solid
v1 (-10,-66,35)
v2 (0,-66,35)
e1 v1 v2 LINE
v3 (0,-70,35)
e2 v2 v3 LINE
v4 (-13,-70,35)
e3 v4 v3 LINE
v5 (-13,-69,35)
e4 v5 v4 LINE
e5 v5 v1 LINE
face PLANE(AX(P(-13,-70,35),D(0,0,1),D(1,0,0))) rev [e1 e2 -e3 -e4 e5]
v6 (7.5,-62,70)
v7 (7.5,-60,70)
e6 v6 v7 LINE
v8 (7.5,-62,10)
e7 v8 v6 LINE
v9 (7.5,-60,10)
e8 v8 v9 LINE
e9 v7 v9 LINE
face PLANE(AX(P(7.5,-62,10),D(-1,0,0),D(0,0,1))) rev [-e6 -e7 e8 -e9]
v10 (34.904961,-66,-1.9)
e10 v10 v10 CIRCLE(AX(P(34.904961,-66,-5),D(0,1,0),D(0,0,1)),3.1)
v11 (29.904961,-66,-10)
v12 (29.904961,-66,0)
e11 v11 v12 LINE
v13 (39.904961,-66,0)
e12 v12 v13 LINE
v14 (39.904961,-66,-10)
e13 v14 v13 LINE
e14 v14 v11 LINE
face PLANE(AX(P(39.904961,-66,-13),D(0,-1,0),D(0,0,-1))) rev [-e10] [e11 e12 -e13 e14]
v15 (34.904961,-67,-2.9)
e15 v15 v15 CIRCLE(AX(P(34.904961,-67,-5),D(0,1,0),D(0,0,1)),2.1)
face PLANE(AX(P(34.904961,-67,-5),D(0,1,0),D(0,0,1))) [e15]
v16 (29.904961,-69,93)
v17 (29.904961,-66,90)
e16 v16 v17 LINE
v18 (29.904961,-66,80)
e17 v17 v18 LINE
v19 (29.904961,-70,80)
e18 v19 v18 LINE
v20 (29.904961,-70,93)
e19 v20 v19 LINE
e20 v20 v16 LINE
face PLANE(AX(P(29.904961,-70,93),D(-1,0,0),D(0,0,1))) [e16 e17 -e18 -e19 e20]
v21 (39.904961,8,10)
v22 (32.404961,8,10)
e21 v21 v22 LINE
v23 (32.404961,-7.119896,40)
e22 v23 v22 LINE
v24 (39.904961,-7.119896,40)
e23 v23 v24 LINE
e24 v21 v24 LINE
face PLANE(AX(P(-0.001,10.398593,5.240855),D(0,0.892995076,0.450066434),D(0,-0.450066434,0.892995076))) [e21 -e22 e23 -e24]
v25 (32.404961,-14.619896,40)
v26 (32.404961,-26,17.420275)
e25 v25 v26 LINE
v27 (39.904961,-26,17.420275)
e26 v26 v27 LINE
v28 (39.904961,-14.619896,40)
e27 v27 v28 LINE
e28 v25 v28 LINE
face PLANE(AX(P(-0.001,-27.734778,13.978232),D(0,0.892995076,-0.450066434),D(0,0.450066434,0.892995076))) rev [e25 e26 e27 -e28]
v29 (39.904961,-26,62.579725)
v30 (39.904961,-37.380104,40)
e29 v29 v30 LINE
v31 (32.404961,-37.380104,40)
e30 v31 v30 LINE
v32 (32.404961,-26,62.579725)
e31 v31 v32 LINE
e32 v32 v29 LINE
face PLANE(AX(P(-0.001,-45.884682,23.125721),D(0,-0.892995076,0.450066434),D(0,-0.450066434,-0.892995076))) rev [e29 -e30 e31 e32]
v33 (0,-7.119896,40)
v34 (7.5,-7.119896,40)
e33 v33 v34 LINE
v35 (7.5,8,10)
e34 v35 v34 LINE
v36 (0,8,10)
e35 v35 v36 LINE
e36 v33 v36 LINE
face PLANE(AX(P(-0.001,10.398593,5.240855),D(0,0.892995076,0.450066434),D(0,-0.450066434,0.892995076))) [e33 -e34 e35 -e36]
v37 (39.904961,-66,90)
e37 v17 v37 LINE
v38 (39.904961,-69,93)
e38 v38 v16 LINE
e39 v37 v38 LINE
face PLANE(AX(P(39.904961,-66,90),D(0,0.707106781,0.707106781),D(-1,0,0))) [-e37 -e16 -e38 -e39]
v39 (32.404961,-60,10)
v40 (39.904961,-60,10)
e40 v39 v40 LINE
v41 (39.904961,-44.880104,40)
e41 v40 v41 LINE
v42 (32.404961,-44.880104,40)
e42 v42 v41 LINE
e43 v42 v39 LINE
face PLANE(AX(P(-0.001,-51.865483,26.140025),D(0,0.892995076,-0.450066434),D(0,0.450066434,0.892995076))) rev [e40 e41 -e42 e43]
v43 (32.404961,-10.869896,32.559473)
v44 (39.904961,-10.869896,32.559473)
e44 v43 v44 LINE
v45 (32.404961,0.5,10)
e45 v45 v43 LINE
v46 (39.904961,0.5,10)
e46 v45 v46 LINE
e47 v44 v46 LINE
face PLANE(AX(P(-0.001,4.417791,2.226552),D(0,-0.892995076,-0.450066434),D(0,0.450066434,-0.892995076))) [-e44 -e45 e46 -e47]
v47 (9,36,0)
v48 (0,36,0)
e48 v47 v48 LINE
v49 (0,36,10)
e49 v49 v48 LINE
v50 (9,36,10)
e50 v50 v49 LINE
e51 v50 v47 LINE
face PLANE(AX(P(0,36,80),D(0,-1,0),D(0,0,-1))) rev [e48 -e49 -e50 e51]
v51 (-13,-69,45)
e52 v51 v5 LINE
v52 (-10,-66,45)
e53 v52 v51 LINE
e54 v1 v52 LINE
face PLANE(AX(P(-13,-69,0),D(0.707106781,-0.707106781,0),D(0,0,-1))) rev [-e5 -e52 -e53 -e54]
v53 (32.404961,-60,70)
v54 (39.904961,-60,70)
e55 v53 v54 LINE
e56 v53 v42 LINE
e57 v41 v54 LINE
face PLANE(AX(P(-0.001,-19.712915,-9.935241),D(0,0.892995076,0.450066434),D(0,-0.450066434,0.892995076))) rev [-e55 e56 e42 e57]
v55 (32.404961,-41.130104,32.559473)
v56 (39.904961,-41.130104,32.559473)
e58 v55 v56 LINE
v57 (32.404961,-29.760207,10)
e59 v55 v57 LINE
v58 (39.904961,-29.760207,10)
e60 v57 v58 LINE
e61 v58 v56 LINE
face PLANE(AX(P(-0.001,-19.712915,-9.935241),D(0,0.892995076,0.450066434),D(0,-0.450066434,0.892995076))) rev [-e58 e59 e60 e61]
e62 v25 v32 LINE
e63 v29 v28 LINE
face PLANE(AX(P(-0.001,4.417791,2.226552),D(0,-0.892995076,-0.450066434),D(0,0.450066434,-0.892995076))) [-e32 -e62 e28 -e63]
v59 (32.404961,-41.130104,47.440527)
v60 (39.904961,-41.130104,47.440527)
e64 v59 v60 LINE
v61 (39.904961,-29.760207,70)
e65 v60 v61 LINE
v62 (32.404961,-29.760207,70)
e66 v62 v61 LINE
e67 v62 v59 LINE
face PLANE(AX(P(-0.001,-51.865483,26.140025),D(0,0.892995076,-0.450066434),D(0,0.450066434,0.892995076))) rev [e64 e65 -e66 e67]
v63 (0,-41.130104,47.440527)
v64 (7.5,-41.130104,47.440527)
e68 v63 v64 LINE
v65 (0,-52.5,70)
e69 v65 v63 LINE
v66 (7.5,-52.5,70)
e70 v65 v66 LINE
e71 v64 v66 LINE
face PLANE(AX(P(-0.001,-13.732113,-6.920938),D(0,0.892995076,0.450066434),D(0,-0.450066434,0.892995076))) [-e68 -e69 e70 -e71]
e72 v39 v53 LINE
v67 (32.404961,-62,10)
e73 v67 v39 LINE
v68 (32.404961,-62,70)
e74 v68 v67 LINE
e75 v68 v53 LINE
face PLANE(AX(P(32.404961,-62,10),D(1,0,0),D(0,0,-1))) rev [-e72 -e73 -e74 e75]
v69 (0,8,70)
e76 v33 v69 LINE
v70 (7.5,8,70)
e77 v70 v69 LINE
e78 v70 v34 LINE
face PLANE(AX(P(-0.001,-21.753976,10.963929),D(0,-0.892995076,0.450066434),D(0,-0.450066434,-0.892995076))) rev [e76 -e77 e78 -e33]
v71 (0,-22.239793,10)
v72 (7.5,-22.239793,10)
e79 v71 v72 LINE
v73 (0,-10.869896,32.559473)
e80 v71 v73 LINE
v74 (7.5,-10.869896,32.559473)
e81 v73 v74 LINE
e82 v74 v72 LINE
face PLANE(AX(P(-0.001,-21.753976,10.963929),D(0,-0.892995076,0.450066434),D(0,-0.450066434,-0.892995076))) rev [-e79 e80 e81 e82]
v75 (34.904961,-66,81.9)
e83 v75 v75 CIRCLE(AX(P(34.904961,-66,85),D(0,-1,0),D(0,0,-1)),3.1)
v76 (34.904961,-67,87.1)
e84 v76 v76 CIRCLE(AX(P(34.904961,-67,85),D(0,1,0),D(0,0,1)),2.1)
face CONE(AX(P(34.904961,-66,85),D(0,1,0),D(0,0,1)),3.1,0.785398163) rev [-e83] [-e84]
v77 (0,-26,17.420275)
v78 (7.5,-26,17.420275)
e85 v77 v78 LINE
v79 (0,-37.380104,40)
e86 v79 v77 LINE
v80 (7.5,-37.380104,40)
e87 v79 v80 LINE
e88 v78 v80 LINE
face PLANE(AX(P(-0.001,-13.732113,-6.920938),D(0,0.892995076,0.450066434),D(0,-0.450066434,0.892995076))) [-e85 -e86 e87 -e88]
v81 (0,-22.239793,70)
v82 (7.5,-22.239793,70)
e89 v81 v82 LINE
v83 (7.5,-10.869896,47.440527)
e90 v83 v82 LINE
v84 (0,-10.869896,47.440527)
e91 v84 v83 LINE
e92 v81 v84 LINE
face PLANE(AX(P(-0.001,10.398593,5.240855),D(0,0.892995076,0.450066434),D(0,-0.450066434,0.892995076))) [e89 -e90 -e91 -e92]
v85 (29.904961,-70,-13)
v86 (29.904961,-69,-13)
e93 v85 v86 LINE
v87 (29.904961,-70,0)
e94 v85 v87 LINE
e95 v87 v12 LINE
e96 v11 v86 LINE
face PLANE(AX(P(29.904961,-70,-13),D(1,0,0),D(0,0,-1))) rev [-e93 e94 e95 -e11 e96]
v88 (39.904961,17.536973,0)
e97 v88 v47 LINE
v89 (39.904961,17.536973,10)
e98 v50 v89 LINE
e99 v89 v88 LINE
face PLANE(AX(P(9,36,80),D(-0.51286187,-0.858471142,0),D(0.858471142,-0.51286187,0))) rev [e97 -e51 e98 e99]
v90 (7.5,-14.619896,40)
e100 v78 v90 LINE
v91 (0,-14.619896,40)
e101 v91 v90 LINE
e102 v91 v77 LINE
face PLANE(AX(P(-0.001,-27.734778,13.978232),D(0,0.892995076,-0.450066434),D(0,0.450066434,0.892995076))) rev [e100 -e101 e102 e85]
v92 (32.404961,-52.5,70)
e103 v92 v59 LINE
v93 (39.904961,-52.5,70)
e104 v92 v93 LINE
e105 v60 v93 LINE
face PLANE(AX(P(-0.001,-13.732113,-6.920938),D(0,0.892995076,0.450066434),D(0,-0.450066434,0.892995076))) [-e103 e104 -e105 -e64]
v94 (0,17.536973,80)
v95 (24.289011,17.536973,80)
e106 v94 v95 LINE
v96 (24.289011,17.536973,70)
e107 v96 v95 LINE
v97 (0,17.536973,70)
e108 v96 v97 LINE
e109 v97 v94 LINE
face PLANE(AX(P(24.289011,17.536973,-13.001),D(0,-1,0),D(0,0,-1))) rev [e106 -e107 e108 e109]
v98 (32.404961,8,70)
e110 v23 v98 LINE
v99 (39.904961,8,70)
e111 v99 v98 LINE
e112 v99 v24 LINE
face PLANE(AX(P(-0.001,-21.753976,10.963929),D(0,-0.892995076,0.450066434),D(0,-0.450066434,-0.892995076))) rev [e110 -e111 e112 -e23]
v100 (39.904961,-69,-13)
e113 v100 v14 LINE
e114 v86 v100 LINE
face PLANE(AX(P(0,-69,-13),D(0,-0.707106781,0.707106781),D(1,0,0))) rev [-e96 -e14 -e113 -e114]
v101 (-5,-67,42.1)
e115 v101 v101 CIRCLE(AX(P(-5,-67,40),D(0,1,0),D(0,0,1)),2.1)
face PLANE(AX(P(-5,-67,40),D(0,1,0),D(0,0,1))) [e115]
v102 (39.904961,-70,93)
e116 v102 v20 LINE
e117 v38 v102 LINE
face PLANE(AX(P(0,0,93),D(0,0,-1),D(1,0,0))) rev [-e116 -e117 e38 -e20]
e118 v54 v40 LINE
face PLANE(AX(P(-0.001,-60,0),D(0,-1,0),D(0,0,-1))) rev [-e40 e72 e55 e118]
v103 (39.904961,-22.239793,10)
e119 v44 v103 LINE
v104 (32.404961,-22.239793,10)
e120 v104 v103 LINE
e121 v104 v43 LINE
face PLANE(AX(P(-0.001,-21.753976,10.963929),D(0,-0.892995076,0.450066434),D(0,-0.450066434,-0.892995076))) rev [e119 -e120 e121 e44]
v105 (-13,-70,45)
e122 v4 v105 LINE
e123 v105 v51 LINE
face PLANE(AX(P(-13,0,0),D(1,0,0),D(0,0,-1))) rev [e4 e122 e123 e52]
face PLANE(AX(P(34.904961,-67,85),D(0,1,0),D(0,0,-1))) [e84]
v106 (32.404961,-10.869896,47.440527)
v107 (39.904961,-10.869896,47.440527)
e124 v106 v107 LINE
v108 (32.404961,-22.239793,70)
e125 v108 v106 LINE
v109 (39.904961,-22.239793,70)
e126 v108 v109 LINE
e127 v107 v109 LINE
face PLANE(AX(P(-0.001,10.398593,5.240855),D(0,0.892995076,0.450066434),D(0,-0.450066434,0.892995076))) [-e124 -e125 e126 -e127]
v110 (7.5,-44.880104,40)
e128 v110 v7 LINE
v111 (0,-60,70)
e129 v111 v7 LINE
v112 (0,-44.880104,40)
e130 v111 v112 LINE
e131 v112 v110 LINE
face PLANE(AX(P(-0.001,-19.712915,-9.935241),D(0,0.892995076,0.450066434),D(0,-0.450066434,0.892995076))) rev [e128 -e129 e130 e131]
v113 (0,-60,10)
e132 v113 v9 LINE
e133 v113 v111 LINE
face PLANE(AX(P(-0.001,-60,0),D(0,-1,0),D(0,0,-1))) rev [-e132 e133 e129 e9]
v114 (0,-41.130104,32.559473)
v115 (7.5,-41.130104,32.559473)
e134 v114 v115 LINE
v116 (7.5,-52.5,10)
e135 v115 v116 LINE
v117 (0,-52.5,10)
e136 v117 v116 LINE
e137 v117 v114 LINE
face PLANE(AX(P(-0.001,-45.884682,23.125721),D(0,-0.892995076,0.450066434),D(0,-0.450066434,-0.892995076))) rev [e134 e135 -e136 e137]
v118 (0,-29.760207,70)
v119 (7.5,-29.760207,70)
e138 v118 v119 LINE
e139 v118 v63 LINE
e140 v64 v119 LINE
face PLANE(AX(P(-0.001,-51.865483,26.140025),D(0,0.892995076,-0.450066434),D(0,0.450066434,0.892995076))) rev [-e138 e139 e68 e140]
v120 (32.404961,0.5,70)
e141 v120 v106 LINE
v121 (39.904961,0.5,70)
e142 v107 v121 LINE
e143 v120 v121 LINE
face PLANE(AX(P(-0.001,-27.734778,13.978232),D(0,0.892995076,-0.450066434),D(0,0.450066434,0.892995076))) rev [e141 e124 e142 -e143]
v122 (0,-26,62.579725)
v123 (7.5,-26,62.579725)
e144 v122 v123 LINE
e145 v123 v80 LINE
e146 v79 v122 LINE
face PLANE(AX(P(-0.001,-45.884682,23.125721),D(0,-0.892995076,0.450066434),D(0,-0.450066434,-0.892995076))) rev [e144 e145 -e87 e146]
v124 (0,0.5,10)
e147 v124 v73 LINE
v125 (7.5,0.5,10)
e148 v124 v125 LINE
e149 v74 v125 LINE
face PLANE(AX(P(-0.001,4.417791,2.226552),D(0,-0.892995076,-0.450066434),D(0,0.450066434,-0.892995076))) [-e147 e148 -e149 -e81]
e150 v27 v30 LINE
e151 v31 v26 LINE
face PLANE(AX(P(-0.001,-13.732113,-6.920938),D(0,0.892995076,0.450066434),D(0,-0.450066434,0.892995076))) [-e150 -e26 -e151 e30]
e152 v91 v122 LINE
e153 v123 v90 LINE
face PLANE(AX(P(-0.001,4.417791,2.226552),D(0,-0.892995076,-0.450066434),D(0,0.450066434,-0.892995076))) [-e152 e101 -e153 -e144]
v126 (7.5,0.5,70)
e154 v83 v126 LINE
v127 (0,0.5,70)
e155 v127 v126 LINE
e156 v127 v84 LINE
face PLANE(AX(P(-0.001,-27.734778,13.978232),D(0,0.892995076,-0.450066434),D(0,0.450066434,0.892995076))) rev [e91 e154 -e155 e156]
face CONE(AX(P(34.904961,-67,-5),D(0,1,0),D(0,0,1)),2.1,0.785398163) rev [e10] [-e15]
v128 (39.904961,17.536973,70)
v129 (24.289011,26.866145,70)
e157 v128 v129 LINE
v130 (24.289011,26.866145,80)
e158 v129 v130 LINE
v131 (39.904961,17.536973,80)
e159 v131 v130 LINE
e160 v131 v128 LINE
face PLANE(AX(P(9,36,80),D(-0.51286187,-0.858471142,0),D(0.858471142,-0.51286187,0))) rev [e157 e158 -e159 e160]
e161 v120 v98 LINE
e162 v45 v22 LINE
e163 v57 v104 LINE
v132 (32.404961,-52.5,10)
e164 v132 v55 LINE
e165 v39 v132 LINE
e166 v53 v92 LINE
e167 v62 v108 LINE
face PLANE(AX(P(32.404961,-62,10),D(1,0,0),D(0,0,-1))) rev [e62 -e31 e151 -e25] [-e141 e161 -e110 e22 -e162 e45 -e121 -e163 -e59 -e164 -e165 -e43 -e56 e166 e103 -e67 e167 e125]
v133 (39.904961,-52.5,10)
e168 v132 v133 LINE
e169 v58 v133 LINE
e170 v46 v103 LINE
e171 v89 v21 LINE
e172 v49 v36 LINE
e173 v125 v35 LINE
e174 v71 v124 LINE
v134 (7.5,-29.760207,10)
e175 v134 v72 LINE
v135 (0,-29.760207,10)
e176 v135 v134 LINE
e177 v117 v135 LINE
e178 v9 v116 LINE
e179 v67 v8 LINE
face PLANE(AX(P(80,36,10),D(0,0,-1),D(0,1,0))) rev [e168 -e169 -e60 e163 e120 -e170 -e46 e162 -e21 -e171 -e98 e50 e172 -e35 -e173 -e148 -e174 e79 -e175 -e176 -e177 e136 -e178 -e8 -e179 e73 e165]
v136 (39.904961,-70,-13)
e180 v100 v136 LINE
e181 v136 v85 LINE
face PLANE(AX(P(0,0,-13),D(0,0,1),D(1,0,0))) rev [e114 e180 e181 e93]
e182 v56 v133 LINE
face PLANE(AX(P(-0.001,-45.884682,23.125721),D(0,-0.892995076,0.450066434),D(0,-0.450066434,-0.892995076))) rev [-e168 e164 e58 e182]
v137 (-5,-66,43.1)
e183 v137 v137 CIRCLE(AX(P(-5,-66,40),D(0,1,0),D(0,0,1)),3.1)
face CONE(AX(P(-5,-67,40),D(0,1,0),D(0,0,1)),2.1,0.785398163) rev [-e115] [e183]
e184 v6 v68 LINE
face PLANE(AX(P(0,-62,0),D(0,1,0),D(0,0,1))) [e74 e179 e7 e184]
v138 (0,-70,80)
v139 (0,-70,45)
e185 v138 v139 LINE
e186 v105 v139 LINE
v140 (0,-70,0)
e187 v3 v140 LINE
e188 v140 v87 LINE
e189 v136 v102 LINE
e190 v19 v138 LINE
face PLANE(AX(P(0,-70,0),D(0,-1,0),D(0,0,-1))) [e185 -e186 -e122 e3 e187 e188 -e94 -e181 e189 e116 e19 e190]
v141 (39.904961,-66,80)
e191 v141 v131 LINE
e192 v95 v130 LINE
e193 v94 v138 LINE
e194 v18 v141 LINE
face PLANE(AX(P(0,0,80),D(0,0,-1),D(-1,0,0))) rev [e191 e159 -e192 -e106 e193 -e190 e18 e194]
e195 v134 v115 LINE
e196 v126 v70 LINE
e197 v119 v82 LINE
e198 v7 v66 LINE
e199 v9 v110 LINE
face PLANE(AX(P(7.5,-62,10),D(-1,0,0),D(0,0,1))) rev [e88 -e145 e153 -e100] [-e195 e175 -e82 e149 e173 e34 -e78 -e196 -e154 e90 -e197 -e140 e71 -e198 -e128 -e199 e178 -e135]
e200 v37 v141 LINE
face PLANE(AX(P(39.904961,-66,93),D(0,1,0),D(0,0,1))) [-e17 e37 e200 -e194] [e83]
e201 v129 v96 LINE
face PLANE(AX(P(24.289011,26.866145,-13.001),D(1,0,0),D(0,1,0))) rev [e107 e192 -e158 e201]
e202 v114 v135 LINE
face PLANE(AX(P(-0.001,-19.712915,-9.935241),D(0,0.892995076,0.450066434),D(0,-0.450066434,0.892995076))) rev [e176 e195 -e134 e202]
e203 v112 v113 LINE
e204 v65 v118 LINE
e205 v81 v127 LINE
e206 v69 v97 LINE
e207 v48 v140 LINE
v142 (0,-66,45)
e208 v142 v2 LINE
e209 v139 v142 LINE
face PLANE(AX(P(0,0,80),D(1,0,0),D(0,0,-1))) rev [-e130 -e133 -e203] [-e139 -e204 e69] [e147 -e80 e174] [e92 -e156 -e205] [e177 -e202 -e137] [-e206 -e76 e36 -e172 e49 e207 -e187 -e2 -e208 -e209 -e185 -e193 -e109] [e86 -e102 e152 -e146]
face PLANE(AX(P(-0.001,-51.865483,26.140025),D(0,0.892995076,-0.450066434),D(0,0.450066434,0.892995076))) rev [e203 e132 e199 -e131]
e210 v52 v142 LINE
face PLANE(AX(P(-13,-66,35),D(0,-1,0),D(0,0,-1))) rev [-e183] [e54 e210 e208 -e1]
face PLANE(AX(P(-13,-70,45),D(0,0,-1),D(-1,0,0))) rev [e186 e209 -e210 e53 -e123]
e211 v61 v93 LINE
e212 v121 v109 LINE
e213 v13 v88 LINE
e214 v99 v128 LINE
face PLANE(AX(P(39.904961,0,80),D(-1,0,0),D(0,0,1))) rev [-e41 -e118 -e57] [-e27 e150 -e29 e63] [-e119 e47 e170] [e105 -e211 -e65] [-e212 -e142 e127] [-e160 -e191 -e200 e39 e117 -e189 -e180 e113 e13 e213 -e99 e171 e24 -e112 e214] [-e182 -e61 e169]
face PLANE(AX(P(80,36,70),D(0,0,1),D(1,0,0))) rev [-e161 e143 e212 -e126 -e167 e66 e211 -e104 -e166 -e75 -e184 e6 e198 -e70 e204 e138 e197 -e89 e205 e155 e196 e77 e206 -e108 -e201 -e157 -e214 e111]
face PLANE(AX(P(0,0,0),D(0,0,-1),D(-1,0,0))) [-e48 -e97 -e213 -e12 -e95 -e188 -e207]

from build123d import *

# Parameters (mm, degrees)
BOSS_EXTRUDE1_DEPTH      = 80
SKETCH2_W                = 60
SKETCH2_H                = 28
CUT_EXTRUDE1_DEPTH       = 80
SKETCH3_W                = 39.904961116
SKETCH3_H                = 80
BOSS_EXTRUDE2_DEPTH      = 70
CUT_EXTRUDE4_REACH       = 115.545
SKETCH6_W                = 24.904961116
SKETCH6_H                = 60
CUT_EXTRUDE5_DEPTH       = 70
SKETCH7_W                = 10
SKETCH7_H                = 4
BOSS_EXTRUDE3_DEPTH      = 13
SKETCH8_R                = 3.1
CUT_EXTRUDE6_DEPTH       = 1
CHAMFER1_SIZE            = 1
CHAMFER2_SIZE            = 3
CHAMFER2_OF_MIRROR1_SIZE = 3
SKETCH9_W                = 10
SKETCH9_H                = 4
BOSS_EXTRUDE4_DEPTH      = 13
SKETCH10_R               = 3.1
CUT_EXTRUDE7_DEPTH       = 1
CHAMFER3_SIZE            = 3
CHAMFER4_SIZE            = 1
CHAMFER5_SIZE            = 1
CUT_EXTRUDE8_REACH       = 125.05


with BuildPart() as part:
    # Sketch1 → Boss-Extrude1 (new body)
    with BuildSketch(Plane.XY):
        Polygon((9, 36), (39.904961116, 17.536972664), (39.904961116, 0), (0, 0), (0, 36), align=None)
    extrude(amount=BOSS_EXTRUDE1_DEPTH)

    # Sketch2 → Cut-Extrude1 (cut)
    with BuildSketch(Plane.ZY):
        with Locations((40, 22)):
            Rectangle(SKETCH2_W, SKETCH2_H)
    extrude(amount=-CUT_EXTRUDE1_DEPTH, mode=Mode.SUBTRACT)

    # Sketch3 → Boss-Extrude2 (add)
    with BuildSketch(Plane.XZ):
        with Locations((19.952480558, 40)):
            Rectangle(SKETCH3_W, SKETCH3_H)
    extrude(amount=BOSS_EXTRUDE2_DEPTH)

    # Sketch4 → Cut-Extrude4 (cut, up to next)
    with BuildSketch(Plane(origin=(39.904961116, 0, 0), x_dir=(0, 0, -1), z_dir=(1, 0, 0)), mode=Mode.PRIVATE) as cut_extrude4_sk1:
        Polygon((-10, 8), (-40, -7.119896394), (-70, 8), align=None)
    cut_extrude4_tool1 = extrude(cut_extrude4_sk1.sketch, amount=-CUT_EXTRUDE4_REACH, mode=Mode.PRIVATE) & part.part
    # Sketch4 → Cut-Extrude4 (cut, up to next)
    with BuildSketch(Plane(origin=(39.904961116, 0, 0), x_dir=(0, 0, -1), z_dir=(1, 0, 0)), mode=Mode.PRIVATE) as cut_extrude4_sk2:
        Polygon((-47.440527175, -10.869896394), (-70, 0.5), (-70, -22.239792788), align=None)
    cut_extrude4_tool2 = extrude(cut_extrude4_sk2.sketch, amount=-CUT_EXTRUDE4_REACH, mode=Mode.PRIVATE) & part.part
    # Sketch4 → Cut-Extrude4 (cut, up to next)
    with BuildSketch(Plane(origin=(39.904961116, 0, 0), x_dir=(0, 0, -1), z_dir=(1, 0, 0)), mode=Mode.PRIVATE) as cut_extrude4_sk3:
        Polygon((-47.440527175, -41.130103606), (-70, -29.760207212), (-70, -52.5), align=None)
    cut_extrude4_tool3 = extrude(cut_extrude4_sk3.sketch, amount=-CUT_EXTRUDE4_REACH, mode=Mode.PRIVATE) & part.part
    # Sketch4 → Cut-Extrude4 (cut, up to next)
    with BuildSketch(Plane(origin=(39.904961116, 0, 0), x_dir=(0, 0, -1), z_dir=(1, 0, 0)), mode=Mode.PRIVATE) as cut_extrude4_sk4:
        Polygon((-10, -60), (-40, -44.880103606), (-70, -60), align=None)
    cut_extrude4_tool4 = extrude(cut_extrude4_sk4.sketch, amount=-CUT_EXTRUDE4_REACH, mode=Mode.PRIVATE) & part.part
    # Sketch4 → Cut-Extrude4 (cut, up to next)
    with BuildSketch(Plane(origin=(39.904961116, 0, 0), x_dir=(0, 0, -1), z_dir=(1, 0, 0)), mode=Mode.PRIVATE) as cut_extrude4_sk5:
        Polygon((-10, -52.5), (-10, -29.760207212), (-32.559472825, -41.130103606), align=None)
    cut_extrude4_tool5 = extrude(cut_extrude4_sk5.sketch, amount=-CUT_EXTRUDE4_REACH, mode=Mode.PRIVATE) & part.part
    # Sketch4 → Cut-Extrude4 (cut, up to next)
    with BuildSketch(Plane(origin=(39.904961116, 0, 0), x_dir=(0, 0, -1), z_dir=(1, 0, 0)), mode=Mode.PRIVATE) as cut_extrude4_sk6:
        Polygon((-62.579725368, -26), (-40, -14.619896394), (-17.420274632, -26), (-40, -37.380103606), align=None)
    cut_extrude4_tool6 = extrude(cut_extrude4_sk6.sketch, amount=-CUT_EXTRUDE4_REACH, mode=Mode.PRIVATE) & part.part
    # Sketch4 → Cut-Extrude4 (cut, up to next)
    with BuildSketch(Plane(origin=(39.904961116, 0, 0), x_dir=(0, 0, -1), z_dir=(1, 0, 0)), mode=Mode.PRIVATE) as cut_extrude4_sk7:
        Polygon((-10, -22.239792788), (-10, 0.5), (-32.559472825, -10.869896394), align=None)
    cut_extrude4_tool7 = extrude(cut_extrude4_sk7.sketch, amount=-CUT_EXTRUDE4_REACH, mode=Mode.PRIVATE) & part.part
    add(cut_extrude4_tool1.solids().sort_by_distance((39.904961, 2.960035, 40))[0], mode=Mode.SUBTRACT)
    add(cut_extrude4_tool2.solids().sort_by_distance((39.904961, -10.869896, 62.480176))[0], mode=Mode.SUBTRACT)
    add(cut_extrude4_tool3.solids().sort_by_distance((39.904961, -41.130104, 62.480176))[0], mode=Mode.SUBTRACT)
    add(cut_extrude4_tool4.solids().sort_by_distance((39.904961, -54.960035, 40))[0], mode=Mode.SUBTRACT)
    add(cut_extrude4_tool5.solids().sort_by_distance((39.904961, -41.130104, 17.519824))[0], mode=Mode.SUBTRACT)
    add(cut_extrude4_tool6.solids().sort_by_distance((39.904961, -26, 40))[0], mode=Mode.SUBTRACT)
    add(cut_extrude4_tool7.solids().sort_by_distance((39.904961, -10.869896, 17.519824))[0], mode=Mode.SUBTRACT)

    # Sketch6 → Cut-Extrude5 (cut)
    with BuildSketch(Plane(origin=(0, 8, 0), x_dir=(1, 0, 0), z_dir=(0, 1, 0))):
        with Locations((19.952480558, -40)):
            Rectangle(SKETCH6_W, SKETCH6_H)
    extrude(amount=-CUT_EXTRUDE5_DEPTH, mode=Mode.SUBTRACT)

    # Sketch7 → Boss-Extrude3 (add)
    with BuildSketch(Plane(origin=(0, 0, 0), x_dir=(-1, 0, 0), z_dir=(0, 0, -1))):
        with Locations((-34.904961116, -68)):
            Rectangle(SKETCH7_W, SKETCH7_H)
    boss_extrude3 = extrude(amount=BOSS_EXTRUDE3_DEPTH)

    # Sketch8 → Cut-Extrude6 (cut)
    with BuildSketch(Plane(origin=(0, -66, 0), x_dir=(1, 0, 0), z_dir=(0, 1, 0))):
        with Locations(Location((34.904961116, 5, 0), (0, 0, 270))):
            Circle(SKETCH8_R)
    cut_extrude6 = extrude(amount=-CUT_EXTRUDE6_DEPTH, mode=Mode.SUBTRACT)

    # Chamfer1
    chamfer1_edges = [part.edges().sort_by_distance(p)[0] for p in [
        (34.904961116, -67, -8.1),
    ]]
    chamfer(chamfer1_edges, length=CHAMFER1_SIZE - 0.0001)  # a hair under: the kernel refuses the full size

    # Chamfer2
    chamfer2_edges = [part.edges().sort_by_distance(p)[0] for p in [
        (34.904961116, -66, -13),
    ]]
    chamfer(chamfer2_edges, length=CHAMFER2_SIZE)

    # Mirror1: Boss-Extrude3, Cut-Extrude6 across plane
    add(boss_extrude3.mirror(Plane.XY.offset(40)))
    add(cut_extrude6.mirror(Plane.XY.offset(40)), mode=Mode.SUBTRACT)

    # Chamfer2 of Mirror1
    chamfer2_of_mirror1_edges = [part.edges().sort_by_distance(p)[0] for p in [
        (34.904961116, -66, 93),
    ]]
    chamfer(chamfer2_of_mirror1_edges, length=CHAMFER2_OF_MIRROR1_SIZE)

    # Sketch9 → Boss-Extrude4 (add)
    with BuildSketch(Plane.ZY):
        with Locations((40, -68)):
            Rectangle(SKETCH9_W, SKETCH9_H)
    extrude(amount=BOSS_EXTRUDE4_DEPTH)

    # Sketch10 → Cut-Extrude7 (cut)
    with BuildSketch(Plane(origin=(0, -66, 0), x_dir=(1, 0, 0), z_dir=(0, 1, 0))):
        with Locations(Location((-5, -40, 0), (0, 0, 270))):
            Circle(SKETCH10_R)
    extrude(amount=-CUT_EXTRUDE7_DEPTH, mode=Mode.SUBTRACT)

    # Chamfer3
    chamfer3_edges = [part.edges().sort_by_distance(p)[0] for p in [
        (-13, -66, 40),
    ]]
    chamfer(chamfer3_edges, length=CHAMFER3_SIZE)

    # Chamfer4
    chamfer4_edges = [part.edges().sort_by_distance(p)[0] for p in [
        (-5, -67, 36.9),
    ]]
    chamfer(chamfer4_edges, length=CHAMFER4_SIZE - 0.0001)  # a hair under: the kernel refuses the full size

    # Chamfer5
    chamfer5_edges = [part.edges().sort_by_distance(p)[0] for p in [
        (34.904961116, -67, 88.1),
    ]]
    chamfer(chamfer5_edges, length=CHAMFER5_SIZE - 0.0001)  # a hair under: the kernel refuses the full size

    # Sketch11 → Cut-Extrude8 (cut, up to next)
    with BuildSketch(Plane.XY.offset(80), mode=Mode.PRIVATE) as cut_extrude8_sk1:
        Polygon((0, 17.536972664), (0, 36), (9, 36), (24.289010788, 26.866145307), (24.289010788, 17.536972664), align=None)
    cut_extrude8_tool1 = extrude(cut_extrude8_sk1.sketch, amount=-CUT_EXTRUDE8_REACH, mode=Mode.PRIVATE) & part.part
    add(cut_extrude8_tool1.solids().sort_by_distance((10.844723, 25.627535, 80))[0], mode=Mode.SUBTRACT)


solid = part.part
